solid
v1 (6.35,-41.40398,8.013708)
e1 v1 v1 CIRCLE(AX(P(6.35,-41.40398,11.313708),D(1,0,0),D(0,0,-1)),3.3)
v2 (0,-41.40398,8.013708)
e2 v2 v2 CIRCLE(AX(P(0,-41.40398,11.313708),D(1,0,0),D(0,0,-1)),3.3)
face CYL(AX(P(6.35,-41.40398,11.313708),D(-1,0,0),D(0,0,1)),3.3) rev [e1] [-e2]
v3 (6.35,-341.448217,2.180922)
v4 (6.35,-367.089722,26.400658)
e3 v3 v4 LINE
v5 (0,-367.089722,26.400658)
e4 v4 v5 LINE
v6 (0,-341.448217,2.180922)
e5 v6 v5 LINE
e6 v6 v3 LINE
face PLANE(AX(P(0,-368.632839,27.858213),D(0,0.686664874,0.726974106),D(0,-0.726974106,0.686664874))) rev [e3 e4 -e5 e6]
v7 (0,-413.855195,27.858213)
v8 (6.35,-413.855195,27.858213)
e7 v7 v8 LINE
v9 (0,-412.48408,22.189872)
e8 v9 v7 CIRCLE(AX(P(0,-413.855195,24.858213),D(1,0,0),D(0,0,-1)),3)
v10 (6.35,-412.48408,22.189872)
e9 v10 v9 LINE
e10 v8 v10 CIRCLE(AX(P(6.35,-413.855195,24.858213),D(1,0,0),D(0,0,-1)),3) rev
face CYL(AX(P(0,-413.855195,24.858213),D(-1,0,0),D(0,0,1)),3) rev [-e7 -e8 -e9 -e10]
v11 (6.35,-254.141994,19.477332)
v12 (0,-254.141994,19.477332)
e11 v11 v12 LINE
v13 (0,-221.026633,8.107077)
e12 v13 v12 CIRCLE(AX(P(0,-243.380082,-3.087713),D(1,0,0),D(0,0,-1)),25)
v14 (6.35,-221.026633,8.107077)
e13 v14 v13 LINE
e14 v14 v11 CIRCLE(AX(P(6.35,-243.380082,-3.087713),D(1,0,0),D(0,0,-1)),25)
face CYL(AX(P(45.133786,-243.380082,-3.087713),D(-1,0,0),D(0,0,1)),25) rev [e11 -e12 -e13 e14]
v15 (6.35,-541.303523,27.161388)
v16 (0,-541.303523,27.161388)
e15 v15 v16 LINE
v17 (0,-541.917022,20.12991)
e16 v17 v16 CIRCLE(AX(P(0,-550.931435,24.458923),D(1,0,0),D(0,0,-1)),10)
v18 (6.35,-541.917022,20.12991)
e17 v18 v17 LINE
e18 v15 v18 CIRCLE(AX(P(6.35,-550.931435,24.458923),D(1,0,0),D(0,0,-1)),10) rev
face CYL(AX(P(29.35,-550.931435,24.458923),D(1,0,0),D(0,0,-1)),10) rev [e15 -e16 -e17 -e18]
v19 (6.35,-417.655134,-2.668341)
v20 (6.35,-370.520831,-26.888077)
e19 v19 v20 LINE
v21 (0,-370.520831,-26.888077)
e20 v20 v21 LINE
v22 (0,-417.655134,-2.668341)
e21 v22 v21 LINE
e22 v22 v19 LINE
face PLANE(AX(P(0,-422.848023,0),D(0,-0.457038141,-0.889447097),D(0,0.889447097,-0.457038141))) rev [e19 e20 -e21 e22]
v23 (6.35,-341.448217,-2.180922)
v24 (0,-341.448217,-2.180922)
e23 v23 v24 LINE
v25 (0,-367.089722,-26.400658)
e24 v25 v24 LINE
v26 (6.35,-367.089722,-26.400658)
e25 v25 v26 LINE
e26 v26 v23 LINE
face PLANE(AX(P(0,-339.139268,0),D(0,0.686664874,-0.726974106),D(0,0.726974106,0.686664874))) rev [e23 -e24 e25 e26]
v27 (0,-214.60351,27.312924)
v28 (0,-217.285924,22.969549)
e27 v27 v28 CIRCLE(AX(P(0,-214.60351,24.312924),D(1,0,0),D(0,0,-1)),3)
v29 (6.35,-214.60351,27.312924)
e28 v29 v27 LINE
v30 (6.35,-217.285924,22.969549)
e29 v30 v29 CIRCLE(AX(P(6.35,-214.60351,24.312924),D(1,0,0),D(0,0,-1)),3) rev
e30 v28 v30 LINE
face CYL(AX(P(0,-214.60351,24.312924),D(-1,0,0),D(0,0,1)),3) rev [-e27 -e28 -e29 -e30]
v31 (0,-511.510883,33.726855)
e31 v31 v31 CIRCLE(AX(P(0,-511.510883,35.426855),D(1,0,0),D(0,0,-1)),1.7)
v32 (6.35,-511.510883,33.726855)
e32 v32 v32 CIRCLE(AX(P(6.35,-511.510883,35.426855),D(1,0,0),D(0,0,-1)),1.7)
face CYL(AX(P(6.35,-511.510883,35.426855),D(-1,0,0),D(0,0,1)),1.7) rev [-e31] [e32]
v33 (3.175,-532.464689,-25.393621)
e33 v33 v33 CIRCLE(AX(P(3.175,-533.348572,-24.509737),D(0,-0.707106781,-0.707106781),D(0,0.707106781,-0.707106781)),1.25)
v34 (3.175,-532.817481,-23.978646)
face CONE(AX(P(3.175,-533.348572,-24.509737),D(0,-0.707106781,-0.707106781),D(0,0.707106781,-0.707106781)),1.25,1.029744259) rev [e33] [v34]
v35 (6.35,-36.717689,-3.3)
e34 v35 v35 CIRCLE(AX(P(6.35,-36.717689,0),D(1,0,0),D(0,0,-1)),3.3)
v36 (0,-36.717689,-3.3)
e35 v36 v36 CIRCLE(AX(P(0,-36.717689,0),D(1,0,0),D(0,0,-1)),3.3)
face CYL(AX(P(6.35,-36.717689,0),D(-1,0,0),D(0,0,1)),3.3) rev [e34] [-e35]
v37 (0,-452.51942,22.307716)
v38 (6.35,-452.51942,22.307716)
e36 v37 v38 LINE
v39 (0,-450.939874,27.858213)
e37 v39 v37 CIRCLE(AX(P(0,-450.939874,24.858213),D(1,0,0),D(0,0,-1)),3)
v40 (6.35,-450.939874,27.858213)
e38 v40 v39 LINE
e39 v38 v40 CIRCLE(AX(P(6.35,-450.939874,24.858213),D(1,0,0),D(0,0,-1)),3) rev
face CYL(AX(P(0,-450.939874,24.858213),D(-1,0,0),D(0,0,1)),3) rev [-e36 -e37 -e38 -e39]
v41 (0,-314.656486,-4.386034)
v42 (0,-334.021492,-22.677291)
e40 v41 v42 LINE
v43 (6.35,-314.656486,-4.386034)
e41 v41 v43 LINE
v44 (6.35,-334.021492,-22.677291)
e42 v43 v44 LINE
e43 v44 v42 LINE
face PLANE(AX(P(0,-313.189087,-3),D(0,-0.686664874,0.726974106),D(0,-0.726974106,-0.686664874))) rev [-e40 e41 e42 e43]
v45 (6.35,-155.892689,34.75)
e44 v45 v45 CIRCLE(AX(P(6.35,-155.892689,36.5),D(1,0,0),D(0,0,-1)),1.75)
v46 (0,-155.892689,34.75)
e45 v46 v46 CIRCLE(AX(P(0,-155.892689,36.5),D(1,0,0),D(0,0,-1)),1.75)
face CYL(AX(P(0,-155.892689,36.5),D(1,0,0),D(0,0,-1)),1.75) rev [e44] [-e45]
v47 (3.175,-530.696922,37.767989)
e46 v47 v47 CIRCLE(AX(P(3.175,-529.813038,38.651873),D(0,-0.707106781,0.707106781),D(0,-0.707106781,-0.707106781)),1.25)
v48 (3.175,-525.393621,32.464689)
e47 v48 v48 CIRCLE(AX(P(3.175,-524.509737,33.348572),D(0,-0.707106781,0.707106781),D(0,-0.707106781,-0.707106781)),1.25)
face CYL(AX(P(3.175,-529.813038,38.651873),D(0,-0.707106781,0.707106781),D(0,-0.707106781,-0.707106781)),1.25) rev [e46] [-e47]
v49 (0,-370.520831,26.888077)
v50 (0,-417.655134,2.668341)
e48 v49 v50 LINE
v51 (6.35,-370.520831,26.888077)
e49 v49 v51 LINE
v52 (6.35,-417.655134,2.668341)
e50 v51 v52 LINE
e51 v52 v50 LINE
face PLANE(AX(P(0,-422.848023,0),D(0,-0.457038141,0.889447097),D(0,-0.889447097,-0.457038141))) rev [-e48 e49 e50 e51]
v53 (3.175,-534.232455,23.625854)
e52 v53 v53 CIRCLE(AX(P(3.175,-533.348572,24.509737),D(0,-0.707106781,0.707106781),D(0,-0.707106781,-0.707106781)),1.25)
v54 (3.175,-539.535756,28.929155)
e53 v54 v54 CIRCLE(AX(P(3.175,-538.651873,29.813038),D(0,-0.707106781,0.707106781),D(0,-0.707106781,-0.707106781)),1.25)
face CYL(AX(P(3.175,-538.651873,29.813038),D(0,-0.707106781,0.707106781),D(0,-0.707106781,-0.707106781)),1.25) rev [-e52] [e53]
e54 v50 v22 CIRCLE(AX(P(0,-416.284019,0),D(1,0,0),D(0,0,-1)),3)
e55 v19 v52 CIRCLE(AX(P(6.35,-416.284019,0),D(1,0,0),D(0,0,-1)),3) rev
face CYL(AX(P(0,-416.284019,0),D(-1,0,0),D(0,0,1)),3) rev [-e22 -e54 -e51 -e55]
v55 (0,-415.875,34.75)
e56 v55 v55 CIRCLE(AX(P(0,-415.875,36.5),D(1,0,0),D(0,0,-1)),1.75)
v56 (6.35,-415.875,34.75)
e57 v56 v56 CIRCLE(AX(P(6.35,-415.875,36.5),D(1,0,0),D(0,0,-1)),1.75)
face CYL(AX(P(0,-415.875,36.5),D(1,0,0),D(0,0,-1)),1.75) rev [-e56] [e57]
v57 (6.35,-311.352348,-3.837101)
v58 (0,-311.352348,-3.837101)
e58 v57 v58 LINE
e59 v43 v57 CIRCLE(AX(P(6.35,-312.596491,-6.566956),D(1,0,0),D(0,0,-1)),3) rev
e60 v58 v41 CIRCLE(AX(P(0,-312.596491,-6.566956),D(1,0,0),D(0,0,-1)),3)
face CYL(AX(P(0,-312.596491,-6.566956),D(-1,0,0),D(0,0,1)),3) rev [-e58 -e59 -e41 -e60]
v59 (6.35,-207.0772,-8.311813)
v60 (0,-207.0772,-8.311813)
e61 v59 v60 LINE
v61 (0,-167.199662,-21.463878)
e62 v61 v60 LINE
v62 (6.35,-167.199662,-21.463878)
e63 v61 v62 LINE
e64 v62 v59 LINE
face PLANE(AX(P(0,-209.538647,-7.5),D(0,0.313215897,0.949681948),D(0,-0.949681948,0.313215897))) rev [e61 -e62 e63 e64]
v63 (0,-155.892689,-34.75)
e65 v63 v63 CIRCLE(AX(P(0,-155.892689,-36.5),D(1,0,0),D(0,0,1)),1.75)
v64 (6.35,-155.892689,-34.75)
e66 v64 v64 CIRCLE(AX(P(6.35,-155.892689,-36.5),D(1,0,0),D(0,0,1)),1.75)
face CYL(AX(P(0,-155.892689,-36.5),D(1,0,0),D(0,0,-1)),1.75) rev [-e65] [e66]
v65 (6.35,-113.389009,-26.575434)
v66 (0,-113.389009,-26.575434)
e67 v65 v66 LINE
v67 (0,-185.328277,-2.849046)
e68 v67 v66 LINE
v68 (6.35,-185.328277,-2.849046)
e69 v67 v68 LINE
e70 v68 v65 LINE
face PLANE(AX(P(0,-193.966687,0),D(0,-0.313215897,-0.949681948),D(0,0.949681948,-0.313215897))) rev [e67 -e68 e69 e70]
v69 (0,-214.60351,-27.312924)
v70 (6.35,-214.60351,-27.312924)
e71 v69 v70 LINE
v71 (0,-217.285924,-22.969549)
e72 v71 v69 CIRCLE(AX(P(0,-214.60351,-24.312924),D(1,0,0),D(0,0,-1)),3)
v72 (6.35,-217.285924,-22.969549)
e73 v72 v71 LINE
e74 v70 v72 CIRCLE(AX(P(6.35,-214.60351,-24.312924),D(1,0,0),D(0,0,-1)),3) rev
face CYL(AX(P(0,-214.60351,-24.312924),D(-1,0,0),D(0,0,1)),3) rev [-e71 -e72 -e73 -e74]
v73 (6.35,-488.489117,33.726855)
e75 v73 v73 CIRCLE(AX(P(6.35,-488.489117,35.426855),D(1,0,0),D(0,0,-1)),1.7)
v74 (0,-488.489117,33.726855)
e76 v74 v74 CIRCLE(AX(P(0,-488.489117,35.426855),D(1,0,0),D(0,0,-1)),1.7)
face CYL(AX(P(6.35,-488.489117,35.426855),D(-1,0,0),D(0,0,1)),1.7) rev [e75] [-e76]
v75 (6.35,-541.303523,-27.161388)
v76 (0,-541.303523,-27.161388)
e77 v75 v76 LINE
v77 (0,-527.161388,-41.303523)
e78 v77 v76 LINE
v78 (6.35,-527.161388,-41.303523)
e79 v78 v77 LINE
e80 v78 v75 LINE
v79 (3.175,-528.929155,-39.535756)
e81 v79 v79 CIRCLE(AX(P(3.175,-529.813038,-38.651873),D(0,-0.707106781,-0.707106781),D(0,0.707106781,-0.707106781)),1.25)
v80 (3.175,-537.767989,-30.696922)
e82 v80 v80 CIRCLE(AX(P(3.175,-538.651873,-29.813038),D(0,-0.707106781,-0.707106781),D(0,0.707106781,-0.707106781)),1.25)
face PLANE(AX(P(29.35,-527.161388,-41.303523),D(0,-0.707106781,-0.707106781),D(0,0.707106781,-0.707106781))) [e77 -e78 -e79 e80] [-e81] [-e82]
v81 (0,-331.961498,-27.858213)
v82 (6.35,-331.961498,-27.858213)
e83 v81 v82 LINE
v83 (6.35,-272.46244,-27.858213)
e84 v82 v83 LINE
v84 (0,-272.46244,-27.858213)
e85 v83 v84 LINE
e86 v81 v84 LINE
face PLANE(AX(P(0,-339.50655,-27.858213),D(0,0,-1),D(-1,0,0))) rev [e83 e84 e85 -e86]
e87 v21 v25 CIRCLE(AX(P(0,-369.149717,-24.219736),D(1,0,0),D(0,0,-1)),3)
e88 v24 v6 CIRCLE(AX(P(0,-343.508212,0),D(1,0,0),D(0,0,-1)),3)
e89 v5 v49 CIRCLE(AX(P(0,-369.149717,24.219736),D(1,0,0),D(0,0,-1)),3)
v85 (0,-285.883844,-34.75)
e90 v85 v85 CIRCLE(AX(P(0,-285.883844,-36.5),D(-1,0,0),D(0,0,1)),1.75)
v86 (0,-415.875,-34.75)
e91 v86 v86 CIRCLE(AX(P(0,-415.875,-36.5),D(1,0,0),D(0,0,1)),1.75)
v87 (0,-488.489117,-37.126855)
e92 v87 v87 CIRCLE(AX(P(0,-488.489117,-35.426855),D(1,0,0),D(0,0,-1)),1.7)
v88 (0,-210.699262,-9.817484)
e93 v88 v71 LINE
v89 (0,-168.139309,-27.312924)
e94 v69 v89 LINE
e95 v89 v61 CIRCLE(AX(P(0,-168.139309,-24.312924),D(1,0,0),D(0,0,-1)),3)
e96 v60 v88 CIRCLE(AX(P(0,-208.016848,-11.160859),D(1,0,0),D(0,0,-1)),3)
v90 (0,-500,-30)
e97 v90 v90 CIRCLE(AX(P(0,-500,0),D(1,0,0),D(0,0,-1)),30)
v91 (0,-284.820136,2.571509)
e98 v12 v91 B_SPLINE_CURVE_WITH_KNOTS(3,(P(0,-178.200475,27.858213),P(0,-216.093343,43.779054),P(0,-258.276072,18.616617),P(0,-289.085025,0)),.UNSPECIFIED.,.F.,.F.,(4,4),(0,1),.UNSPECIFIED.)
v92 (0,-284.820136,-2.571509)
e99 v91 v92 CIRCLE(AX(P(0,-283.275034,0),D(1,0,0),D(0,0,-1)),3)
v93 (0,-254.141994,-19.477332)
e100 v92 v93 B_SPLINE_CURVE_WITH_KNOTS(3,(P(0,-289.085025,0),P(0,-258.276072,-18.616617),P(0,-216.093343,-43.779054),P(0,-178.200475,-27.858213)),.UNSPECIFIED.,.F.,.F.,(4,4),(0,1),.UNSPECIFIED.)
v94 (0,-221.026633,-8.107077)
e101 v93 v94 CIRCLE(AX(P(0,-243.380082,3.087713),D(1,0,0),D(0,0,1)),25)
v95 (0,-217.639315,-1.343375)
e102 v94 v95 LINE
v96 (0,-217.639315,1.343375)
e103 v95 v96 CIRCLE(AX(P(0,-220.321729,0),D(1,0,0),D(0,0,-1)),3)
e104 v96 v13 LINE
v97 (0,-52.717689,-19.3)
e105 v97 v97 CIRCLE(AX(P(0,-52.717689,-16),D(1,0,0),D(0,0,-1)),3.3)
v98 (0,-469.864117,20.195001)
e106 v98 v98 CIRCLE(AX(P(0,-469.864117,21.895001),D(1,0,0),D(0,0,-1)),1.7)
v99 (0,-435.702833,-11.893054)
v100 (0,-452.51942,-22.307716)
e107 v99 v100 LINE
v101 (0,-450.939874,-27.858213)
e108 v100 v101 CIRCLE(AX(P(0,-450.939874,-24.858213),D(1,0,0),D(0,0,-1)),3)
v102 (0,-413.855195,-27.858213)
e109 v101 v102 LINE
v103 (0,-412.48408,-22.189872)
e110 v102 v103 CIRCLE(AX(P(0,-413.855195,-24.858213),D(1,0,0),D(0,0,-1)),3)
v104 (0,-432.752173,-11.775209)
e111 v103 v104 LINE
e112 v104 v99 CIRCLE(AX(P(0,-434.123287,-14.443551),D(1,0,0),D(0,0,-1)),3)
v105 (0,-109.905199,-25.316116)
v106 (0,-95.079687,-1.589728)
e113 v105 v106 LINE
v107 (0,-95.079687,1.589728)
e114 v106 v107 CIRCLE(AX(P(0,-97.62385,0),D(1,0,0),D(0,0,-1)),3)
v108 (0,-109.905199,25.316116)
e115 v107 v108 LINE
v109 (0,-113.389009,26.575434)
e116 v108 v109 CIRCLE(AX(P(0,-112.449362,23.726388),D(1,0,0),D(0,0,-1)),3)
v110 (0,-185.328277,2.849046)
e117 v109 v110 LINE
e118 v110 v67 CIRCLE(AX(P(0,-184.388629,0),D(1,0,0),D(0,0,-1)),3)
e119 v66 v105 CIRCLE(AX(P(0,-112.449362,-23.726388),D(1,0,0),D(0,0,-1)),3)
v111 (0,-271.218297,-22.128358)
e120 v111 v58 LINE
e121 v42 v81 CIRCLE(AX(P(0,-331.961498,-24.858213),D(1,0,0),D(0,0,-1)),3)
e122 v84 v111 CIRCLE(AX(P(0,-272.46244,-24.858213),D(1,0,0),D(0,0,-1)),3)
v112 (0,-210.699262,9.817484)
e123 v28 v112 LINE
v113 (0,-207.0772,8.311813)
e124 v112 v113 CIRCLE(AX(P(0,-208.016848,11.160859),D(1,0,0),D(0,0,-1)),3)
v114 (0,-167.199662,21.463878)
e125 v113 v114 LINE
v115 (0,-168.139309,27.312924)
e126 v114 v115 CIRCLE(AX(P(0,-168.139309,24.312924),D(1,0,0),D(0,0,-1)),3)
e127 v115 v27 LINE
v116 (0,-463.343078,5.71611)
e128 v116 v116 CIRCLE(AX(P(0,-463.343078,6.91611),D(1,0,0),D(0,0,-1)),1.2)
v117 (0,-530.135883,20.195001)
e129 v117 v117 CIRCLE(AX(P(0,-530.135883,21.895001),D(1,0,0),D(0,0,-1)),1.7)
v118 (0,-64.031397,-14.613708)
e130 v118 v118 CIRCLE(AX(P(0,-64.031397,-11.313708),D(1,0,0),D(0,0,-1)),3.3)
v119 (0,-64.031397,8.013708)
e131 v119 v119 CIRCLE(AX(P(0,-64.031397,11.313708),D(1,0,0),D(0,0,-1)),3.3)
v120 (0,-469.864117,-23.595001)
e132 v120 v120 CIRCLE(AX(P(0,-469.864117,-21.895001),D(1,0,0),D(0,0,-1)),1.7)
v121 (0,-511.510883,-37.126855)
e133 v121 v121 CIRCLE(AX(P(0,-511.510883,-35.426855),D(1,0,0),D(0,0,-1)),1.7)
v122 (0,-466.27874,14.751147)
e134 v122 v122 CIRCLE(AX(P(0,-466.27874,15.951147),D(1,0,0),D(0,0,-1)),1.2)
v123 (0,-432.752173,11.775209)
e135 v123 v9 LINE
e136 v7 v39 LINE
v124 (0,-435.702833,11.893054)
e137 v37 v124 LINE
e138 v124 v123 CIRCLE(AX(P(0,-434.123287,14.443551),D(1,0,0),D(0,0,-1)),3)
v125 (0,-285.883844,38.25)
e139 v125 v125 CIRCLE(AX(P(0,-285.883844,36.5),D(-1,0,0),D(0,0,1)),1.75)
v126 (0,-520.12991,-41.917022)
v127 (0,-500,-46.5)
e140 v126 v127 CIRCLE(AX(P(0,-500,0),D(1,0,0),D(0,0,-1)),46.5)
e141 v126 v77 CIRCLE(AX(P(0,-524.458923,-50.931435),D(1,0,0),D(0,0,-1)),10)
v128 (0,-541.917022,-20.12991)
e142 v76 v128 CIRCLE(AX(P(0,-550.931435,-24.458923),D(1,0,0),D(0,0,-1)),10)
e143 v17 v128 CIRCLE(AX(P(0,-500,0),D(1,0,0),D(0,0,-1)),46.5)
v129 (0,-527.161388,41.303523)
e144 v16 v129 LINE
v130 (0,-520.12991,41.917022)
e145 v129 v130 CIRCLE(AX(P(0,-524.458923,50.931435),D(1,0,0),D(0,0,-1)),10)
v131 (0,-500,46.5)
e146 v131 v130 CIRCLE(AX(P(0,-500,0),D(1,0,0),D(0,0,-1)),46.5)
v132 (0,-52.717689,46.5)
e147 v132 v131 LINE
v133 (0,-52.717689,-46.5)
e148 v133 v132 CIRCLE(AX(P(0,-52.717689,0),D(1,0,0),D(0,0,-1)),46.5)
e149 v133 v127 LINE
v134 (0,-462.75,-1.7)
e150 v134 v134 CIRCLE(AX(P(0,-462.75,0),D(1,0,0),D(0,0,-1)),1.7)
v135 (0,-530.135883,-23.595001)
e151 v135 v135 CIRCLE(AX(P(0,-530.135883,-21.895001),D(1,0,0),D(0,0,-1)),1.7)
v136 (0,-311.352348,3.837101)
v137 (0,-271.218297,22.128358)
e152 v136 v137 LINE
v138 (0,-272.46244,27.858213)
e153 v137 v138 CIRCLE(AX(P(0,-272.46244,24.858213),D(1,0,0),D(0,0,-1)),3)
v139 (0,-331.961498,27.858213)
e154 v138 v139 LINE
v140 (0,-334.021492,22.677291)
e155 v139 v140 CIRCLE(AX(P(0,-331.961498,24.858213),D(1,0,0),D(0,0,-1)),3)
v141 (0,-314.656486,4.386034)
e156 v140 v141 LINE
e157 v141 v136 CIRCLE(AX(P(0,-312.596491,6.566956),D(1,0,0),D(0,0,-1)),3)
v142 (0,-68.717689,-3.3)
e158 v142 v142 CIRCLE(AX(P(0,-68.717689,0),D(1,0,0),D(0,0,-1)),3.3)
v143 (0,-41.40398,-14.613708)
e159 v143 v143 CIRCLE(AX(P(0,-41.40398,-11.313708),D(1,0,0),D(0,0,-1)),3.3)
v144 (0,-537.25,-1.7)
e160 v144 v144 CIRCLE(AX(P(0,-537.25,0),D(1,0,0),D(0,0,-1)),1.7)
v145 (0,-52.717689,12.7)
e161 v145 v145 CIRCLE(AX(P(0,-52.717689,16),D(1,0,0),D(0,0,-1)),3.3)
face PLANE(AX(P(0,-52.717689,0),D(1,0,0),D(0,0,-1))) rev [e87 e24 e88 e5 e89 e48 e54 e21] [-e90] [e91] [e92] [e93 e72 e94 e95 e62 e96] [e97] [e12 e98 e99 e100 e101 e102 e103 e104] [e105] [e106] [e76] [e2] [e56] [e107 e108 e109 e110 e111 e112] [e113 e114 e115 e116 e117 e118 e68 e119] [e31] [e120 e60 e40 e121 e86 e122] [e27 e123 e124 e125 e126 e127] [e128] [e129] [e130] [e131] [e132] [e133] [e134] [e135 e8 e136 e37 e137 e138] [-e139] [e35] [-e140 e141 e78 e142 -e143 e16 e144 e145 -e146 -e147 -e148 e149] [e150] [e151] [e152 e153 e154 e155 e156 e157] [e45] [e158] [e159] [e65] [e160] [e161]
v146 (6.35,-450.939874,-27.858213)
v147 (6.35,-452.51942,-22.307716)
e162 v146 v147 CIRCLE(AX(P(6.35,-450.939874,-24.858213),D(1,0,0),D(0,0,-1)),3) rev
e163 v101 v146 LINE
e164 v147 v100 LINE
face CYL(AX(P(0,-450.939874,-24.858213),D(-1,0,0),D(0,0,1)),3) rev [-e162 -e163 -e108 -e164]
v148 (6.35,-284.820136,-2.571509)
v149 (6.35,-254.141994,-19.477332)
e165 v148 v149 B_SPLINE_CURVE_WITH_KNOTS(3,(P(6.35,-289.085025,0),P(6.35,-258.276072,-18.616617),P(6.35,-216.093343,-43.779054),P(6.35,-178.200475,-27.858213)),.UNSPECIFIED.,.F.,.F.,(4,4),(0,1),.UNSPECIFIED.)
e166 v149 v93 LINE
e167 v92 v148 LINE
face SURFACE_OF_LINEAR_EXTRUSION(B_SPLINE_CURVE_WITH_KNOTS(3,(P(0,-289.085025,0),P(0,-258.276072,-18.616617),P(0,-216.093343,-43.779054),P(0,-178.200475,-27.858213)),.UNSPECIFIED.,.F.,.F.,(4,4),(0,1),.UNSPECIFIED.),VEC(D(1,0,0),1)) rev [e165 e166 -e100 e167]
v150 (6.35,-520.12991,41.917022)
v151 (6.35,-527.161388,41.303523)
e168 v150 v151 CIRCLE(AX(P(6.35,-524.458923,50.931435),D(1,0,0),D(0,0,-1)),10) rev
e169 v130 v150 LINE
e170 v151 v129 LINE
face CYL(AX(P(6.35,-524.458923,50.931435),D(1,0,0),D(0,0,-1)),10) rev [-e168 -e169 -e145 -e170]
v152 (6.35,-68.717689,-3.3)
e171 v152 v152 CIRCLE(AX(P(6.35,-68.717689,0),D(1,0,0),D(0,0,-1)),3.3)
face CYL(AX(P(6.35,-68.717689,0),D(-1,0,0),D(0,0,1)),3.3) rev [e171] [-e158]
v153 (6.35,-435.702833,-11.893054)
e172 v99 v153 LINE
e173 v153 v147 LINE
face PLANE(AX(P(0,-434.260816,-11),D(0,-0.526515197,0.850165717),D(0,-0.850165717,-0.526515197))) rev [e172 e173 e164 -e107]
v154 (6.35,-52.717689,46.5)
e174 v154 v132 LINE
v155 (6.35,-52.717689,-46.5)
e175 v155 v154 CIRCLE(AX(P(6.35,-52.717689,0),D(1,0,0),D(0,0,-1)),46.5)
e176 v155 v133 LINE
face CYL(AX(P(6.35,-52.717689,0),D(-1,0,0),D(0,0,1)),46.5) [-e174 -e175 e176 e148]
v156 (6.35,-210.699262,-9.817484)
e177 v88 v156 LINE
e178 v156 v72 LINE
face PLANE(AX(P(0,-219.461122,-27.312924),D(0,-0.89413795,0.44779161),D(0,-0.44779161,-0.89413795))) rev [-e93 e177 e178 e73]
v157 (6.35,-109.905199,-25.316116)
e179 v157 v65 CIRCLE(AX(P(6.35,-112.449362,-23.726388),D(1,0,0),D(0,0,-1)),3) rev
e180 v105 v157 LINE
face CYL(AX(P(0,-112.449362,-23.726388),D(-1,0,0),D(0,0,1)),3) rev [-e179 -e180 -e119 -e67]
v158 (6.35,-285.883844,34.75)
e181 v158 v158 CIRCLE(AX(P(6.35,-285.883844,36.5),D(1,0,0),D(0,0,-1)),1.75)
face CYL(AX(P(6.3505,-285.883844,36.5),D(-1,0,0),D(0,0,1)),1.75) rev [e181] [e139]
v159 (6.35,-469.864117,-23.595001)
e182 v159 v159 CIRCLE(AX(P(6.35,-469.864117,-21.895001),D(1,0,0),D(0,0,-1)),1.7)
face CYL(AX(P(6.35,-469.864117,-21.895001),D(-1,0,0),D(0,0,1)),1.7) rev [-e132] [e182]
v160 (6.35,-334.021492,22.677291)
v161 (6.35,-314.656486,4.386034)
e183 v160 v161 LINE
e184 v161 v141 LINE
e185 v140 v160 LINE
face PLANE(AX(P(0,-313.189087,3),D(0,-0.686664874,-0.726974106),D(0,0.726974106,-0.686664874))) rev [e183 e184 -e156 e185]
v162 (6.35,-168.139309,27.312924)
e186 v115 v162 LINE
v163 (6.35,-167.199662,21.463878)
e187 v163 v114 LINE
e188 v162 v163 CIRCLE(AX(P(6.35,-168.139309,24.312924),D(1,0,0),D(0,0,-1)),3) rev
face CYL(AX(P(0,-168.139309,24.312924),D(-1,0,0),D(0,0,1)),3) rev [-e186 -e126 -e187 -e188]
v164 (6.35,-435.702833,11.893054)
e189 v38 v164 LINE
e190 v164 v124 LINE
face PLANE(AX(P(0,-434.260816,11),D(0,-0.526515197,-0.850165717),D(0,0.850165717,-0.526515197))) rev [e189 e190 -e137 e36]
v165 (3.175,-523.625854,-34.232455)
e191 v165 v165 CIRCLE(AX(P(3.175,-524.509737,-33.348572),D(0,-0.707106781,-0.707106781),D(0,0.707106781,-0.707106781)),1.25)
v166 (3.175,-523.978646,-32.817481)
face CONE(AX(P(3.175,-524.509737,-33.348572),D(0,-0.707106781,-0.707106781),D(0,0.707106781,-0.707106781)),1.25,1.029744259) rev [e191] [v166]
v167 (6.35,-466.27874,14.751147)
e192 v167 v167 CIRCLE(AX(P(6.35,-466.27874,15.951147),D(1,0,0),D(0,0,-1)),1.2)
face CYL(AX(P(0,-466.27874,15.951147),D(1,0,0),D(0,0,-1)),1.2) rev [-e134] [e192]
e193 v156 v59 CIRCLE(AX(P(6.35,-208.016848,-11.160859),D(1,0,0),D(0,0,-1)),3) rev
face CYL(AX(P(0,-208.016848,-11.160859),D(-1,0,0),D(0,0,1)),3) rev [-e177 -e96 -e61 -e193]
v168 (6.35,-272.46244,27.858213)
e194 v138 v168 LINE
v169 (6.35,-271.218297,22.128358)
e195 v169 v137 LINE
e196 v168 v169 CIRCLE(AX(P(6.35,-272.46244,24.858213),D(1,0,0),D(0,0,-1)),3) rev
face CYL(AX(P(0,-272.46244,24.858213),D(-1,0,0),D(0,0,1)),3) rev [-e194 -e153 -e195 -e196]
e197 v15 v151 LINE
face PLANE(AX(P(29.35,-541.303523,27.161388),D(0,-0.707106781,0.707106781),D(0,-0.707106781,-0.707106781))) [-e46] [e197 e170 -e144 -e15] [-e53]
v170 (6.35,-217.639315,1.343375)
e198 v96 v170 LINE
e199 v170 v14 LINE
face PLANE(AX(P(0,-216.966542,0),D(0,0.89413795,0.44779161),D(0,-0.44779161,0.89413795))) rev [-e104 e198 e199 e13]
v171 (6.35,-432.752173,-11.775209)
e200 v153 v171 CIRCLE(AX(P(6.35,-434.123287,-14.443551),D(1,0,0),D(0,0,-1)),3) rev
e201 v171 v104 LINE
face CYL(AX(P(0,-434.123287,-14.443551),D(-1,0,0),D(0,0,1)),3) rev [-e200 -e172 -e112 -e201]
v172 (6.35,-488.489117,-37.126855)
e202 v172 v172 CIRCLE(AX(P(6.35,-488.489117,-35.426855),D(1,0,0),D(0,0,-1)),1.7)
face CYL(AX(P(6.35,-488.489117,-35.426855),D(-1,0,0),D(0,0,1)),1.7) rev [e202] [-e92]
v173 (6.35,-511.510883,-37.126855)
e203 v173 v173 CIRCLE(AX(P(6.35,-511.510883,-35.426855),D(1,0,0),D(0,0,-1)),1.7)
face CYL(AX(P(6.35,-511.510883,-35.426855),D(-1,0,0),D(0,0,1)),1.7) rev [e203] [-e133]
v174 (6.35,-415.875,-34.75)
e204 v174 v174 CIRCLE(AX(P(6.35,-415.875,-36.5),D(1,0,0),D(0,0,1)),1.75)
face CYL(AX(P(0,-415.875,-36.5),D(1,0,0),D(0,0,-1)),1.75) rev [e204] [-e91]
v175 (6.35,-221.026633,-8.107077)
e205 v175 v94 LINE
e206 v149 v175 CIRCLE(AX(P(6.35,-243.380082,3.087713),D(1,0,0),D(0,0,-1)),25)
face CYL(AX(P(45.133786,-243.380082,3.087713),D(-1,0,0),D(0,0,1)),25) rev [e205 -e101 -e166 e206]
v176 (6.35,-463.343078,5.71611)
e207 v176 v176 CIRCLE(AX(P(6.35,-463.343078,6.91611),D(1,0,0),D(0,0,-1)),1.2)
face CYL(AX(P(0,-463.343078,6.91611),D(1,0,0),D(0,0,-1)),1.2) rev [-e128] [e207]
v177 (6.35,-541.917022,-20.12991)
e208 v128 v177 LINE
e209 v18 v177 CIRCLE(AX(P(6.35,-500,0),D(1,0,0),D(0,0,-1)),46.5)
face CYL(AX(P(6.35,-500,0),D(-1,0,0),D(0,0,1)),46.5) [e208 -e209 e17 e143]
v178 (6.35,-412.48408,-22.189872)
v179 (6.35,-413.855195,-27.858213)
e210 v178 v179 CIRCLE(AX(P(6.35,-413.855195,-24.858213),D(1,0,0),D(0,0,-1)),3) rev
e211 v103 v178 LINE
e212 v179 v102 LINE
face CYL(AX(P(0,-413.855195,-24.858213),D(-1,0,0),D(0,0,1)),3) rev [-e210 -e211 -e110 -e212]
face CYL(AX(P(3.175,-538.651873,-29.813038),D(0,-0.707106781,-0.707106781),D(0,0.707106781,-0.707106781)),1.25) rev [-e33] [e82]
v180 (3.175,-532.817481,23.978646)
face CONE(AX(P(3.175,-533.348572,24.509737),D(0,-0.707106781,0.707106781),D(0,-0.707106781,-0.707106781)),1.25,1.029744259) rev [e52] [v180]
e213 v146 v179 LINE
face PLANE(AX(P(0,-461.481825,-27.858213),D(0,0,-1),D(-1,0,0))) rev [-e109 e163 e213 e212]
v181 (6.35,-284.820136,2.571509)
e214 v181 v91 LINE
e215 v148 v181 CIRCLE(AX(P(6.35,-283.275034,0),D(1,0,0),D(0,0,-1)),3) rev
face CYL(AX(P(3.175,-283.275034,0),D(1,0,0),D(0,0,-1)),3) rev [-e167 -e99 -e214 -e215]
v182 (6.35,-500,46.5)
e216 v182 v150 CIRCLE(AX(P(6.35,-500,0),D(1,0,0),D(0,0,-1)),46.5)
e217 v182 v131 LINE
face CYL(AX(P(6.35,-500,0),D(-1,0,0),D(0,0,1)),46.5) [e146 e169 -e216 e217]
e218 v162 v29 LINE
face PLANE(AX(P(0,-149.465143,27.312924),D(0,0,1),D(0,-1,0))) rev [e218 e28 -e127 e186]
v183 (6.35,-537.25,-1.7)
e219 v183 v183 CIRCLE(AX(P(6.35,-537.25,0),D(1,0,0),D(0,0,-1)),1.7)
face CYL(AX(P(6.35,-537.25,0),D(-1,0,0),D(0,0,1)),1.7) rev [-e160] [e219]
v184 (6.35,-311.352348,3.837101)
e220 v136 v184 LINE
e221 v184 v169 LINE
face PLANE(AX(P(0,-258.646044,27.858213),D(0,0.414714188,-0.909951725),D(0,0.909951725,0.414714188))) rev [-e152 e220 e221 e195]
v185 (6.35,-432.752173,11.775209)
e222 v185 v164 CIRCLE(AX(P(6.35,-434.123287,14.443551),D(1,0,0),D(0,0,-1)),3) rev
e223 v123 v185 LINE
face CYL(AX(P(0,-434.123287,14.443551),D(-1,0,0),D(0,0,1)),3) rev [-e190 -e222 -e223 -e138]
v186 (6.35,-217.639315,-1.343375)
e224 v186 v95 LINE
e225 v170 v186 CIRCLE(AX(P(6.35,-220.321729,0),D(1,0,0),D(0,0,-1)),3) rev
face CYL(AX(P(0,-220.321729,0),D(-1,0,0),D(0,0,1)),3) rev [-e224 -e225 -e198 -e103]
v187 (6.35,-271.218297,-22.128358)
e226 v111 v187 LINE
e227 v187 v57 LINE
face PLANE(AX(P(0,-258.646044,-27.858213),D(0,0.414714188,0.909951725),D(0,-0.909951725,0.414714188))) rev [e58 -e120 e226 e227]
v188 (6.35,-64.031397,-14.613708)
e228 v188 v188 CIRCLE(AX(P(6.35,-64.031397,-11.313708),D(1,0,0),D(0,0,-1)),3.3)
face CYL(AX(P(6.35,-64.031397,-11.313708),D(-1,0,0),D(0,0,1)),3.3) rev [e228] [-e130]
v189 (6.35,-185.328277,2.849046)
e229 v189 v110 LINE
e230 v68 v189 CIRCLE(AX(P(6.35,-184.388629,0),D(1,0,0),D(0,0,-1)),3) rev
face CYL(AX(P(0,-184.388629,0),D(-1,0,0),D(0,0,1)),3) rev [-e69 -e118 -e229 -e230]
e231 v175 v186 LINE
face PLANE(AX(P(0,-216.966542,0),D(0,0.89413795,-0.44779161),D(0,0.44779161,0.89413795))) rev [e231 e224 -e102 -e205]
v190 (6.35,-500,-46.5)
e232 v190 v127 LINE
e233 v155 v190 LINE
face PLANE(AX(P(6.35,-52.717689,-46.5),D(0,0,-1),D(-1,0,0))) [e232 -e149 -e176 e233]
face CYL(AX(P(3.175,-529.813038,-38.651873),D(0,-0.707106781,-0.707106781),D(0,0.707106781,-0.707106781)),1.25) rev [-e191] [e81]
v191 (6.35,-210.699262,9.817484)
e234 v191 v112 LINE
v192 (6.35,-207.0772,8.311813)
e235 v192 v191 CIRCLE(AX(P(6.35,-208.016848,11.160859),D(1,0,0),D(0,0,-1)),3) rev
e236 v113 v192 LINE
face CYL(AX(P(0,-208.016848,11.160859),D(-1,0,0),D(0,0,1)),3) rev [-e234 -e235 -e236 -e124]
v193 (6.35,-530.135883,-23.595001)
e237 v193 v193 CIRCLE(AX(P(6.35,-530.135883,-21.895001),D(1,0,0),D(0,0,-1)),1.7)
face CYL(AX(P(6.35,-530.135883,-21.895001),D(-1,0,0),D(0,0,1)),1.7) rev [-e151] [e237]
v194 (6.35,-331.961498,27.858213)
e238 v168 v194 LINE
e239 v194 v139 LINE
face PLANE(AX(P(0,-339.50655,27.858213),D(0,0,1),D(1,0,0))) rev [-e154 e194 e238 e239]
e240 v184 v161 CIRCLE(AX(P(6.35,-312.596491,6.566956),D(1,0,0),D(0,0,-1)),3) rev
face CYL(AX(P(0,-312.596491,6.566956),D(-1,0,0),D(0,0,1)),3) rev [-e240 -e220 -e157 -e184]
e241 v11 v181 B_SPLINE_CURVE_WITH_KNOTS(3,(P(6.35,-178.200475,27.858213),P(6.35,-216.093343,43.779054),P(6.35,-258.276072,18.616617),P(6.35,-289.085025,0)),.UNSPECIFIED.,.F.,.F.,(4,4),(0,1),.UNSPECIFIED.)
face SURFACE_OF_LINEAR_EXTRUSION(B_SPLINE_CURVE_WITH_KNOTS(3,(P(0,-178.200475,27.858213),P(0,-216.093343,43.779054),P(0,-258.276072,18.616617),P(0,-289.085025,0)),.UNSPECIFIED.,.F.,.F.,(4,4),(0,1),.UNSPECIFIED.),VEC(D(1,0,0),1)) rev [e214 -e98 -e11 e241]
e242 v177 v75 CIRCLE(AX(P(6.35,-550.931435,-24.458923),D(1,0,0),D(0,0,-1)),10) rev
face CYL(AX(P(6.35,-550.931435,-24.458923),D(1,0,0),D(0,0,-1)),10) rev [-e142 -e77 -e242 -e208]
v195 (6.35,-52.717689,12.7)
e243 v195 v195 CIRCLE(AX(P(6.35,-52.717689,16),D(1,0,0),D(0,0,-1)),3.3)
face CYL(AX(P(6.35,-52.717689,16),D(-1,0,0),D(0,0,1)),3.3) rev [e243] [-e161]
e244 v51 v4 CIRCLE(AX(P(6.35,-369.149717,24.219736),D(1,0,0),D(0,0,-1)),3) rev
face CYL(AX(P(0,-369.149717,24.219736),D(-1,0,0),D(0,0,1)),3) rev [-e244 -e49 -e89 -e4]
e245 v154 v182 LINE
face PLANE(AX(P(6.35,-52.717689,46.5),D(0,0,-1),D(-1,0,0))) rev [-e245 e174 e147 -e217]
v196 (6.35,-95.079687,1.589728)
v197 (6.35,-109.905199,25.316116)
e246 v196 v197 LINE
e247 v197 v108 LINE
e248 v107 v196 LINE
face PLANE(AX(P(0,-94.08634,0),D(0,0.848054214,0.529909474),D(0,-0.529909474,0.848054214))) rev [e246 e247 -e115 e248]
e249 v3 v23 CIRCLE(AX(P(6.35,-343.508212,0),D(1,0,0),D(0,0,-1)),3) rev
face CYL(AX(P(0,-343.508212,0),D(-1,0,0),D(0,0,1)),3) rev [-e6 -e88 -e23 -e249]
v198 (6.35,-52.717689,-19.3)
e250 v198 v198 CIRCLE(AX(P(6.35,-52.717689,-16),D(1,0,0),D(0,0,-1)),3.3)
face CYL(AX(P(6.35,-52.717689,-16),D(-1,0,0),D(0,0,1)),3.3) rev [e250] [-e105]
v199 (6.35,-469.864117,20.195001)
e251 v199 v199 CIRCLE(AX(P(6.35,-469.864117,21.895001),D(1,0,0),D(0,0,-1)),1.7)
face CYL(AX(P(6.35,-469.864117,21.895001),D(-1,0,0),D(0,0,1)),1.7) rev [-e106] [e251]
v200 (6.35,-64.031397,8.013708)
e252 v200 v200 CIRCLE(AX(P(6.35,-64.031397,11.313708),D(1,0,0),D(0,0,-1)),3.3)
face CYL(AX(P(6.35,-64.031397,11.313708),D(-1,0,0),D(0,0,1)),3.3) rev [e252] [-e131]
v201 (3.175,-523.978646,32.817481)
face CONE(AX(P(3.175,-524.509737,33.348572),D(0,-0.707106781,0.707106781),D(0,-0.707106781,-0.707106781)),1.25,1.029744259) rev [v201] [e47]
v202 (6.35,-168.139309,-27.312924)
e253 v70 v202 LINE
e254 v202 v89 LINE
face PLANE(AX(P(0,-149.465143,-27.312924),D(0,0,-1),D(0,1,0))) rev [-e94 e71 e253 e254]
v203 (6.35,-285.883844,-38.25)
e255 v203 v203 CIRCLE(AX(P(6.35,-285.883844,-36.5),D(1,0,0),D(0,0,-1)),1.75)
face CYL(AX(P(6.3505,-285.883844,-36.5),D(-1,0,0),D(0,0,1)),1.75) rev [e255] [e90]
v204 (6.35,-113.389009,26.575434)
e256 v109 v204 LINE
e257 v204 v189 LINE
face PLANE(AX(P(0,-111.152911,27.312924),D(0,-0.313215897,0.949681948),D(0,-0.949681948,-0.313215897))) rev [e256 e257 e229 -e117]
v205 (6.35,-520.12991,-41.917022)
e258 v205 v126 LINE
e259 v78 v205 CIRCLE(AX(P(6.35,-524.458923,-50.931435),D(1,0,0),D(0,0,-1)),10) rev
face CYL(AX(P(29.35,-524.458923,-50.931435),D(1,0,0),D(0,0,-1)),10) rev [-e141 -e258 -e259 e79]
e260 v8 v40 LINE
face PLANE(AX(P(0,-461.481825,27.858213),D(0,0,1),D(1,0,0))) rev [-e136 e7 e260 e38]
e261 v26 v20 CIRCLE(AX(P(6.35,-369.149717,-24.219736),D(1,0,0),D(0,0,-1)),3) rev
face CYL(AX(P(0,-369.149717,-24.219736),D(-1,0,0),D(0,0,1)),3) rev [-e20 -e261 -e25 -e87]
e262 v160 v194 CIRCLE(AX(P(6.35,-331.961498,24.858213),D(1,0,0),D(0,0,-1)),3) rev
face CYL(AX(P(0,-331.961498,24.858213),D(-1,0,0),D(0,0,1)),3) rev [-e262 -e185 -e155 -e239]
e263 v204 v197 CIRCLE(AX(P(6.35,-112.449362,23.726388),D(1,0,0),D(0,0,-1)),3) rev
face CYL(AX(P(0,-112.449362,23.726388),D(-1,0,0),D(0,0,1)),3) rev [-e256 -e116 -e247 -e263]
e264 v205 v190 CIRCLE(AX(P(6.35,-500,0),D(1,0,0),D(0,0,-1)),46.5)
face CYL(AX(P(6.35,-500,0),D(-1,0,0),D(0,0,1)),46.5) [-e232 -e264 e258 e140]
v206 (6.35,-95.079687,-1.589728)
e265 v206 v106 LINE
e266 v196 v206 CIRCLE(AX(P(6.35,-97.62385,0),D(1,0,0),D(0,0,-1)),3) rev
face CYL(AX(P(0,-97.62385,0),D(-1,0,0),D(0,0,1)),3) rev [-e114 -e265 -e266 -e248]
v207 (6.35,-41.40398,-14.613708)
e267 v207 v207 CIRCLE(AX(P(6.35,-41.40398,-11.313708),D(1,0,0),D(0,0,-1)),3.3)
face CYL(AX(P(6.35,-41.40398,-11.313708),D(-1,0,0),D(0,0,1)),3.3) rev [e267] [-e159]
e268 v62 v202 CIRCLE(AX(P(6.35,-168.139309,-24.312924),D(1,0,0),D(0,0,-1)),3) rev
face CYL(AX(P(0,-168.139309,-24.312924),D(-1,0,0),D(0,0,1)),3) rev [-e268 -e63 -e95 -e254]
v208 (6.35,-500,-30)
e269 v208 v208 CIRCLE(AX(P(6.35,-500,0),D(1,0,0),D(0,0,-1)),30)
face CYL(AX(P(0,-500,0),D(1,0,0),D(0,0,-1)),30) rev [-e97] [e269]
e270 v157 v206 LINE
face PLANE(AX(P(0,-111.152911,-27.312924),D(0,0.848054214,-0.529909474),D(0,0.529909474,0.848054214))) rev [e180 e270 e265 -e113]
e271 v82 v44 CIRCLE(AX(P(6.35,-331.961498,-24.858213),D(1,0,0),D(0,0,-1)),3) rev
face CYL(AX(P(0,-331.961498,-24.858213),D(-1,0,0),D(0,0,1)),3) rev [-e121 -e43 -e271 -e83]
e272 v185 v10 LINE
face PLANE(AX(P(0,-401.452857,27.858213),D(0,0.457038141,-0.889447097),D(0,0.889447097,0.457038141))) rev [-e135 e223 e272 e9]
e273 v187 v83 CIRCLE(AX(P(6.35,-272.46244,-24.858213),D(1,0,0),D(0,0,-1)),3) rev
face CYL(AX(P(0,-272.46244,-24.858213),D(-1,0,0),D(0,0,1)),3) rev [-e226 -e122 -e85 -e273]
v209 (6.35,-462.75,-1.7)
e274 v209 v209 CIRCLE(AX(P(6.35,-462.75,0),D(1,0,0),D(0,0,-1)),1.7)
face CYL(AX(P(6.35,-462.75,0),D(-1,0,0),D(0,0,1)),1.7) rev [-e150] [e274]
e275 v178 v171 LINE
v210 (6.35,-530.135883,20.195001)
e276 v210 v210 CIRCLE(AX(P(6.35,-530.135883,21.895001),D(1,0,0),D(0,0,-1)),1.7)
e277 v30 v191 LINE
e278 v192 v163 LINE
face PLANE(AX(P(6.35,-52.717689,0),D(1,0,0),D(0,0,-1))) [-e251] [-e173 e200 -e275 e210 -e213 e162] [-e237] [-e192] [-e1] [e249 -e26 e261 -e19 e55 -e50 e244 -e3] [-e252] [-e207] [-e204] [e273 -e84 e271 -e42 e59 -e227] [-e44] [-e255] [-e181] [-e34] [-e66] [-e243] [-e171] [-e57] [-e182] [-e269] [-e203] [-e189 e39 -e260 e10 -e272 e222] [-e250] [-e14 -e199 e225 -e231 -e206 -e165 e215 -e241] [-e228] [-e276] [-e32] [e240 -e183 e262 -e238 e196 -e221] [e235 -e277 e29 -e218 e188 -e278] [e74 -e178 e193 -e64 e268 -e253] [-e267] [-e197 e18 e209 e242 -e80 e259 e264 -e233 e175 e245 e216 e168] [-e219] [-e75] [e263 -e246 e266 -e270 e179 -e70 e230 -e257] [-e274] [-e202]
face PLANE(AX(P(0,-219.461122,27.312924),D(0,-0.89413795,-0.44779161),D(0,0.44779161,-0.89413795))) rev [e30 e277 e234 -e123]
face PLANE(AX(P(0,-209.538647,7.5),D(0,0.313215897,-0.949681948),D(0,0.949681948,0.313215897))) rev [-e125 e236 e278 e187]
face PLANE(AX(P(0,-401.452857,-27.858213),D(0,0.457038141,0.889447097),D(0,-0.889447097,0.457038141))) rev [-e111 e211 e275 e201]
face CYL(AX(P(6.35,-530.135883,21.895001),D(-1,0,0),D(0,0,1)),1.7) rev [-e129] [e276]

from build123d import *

# Parameters (mm, degrees)
SKETCH1_R                            = 3.3
SKETCH1_R_2                          = 1.7
SKETCH1_R_3                          = 26
BOSS_EXTRUDE1_DEPTH                  = 6.35
CUT_EXTRUDE1_DEPTH                   = 549.511460682
FILLET1_R                            = 3
SKETCH4_R                            = 1.75
CUT_EXTRUDE2_DEPTH                   = 549.511460792
SKETCH5_R                            = 1.2
CUT_EXTRUDE4_DEPTH                   = 549.511460792
BOSS_EXTRUDE2_START                  = -6.35
BOSS_EXTRUDE2_DEPTH                  = 6.35
TAP_DRILL_FOR_M3X0_5_TAP1_AT_2_COUNT = 2
TAP_DRILL_FOR_M3X0_5_TAP1_AT_2_PITCH = 13.03070812
CIRPATTERN1_COUNT                    = 2
CIRPATTERN1_ANGLE                    = 90
CUT_EXTRUDE5_DEPTH                   = 549.511460792
SKETCH10_R                           = 30
CUT_EXTRUDE6_DEPTH                   = 549.511460792
SKETCH11_W                           = 93
SKETCH11_H                           = 52.717688801
CUT_EXTRUDE7_DEPTH                   = 549.511460792
BOSS_EXTRUDE3_DEPTH                  = 6.35
SKETCH13_R                           = 1.75
CUT_EXTRUDE8_DEPTH                   = 549.511460792
SKETCH14_R                           = 1.75
BOSS_EXTRUDE4_DEPTH                  = 6.35
BOSS_EXTRUDE5_DEPTH                  = 6.35
CIRPATTERN2_COUNT                    = 2
CIRPATTERN2_ANGLE                    = 90
FILLET2_R                            = 10


# Read off the part's stored shape, not the designer's step: M3x0.5 Tapped Hole1
with BuildPart() as part:
    # Sketch1 → Boss-Extrude1 (new body)
    with BuildSketch(Plane(origin=(0, 0, 0), x_dir=(0, -1, 0), z_dir=(1, 0, 0))):
        with BuildLine():
            Line((0, 46.5), (500, 46.5))
            ThreePointArc((500, 46.5), (546.5, 0), (500, -46.5))
            Line((500, -46.5), (0, -46.5))
            ThreePointArc((0, -46.5), (-46.5, 0), (0, 46.5))
        make_face()
        with Locations(Location((-16, 0, 0), (0, 0, 90))):
            Circle(SKETCH1_R, mode=Mode.SUBTRACT)
        with Locations(Location((-11.313708499, 11.313708499, 0), (0, 0, 90))):
            Circle(SKETCH1_R, mode=Mode.SUBTRACT)
        with Locations(Location((0, 16, 0), (0, 0, 90))):
            Circle(SKETCH1_R, mode=Mode.SUBTRACT)
        with Locations(Location((11.313708499, 11.313708499, 0), (0, 0, 90))):
            Circle(SKETCH1_R, mode=Mode.SUBTRACT)
        with Locations(Location((16, 0, 0), (0, 0, 90))):
            Circle(SKETCH1_R, mode=Mode.SUBTRACT)
        with Locations(Location((11.313708499, -11.313708499, 0), (0, 0, 90))):
            Circle(SKETCH1_R, mode=Mode.SUBTRACT)
        with Locations(Location((537.25, 0, 0), (0, 0, 90))):
            Circle(SKETCH1_R_2, mode=Mode.SUBTRACT)
        with Locations(Location((530.13588304, -21.895000648, 0), (0, 0, 90))):
            Circle(SKETCH1_R_2, mode=Mode.SUBTRACT)
        with Locations(Location((511.51088304, -35.426855232, 0), (0, 0, 90))):
            Circle(SKETCH1_R_2, mode=Mode.SUBTRACT)
        with Locations(Location((488.48911696, -35.426855232, 0), (0, 0, 90))):
            Circle(SKETCH1_R_2, mode=Mode.SUBTRACT)
        with Locations(Location((469.86411696, -21.895000648, 0), (0, 0, 90))):
            Circle(SKETCH1_R_2, mode=Mode.SUBTRACT)
        with Locations(Location((462.75, 0, 0), (0, 0, 90))):
            Circle(SKETCH1_R_2, mode=Mode.SUBTRACT)
        with Locations(Location((469.86411696, 21.895000648, 0), (0, 0, 90))):
            Circle(SKETCH1_R_2, mode=Mode.SUBTRACT)
        with Locations(Location((488.48911696, 35.426855232, 0), (0, 0, 90))):
            Circle(SKETCH1_R_2, mode=Mode.SUBTRACT)
        with Locations(Location((511.51088304, 35.426855232, 0), (0, 0, 90))):
            Circle(SKETCH1_R_2, mode=Mode.SUBTRACT)
        with Locations(Location((530.13588304, 21.895000648, 0), (0, 0, 90))):
            Circle(SKETCH1_R_2, mode=Mode.SUBTRACT)
        with Locations(Location((500, 0, 0), (0, 0, 90))):
            Circle(SKETCH1_R_3, mode=Mode.SUBTRACT)
        with Locations(Location((0, -16, 0), (0, 0, 90))):
            Circle(SKETCH1_R, mode=Mode.SUBTRACT)
        with Locations(Location((-11.313708499, -11.313708499, 0), (0, 0, 90))):
            Circle(SKETCH1_R, mode=Mode.SUBTRACT)
    extrude(amount=BOSS_EXTRUDE1_DEPTH)

    # Sketch3 → Cut-Extrude1 (cut, through all)
    with BuildSketch(Plane(origin=(6.35, 0, 0), x_dir=(0, 0, -1), z_dir=(1, 0, 0))):
        Polygon((0, -422.848022722), (27.858212922, -368.632839363), (0, -339.139268075), (-27.858212922, -368.632839363), align=None)
        Polygon((0, -41.368651369), (-27.312924288, -58.435222232), (0, -141.248998295), (27.312924288, -58.435222232), align=None)
        Polygon((3, -313.189087212), (27.858212922, -339.506549748), (27.858212922, -258.646044282), align=None)
        Polygon((-27.858212922, -339.506549748), (-27.858212922, -258.646044282), (-3, -313.189087212), align=None)
        Polygon((-27.858212922, -401.452857349), (-11, -434.260816252), (-27.858212922, -461.481824785), align=None)
        Polygon((11, -434.260816252), (27.858212922, -461.481824785), (27.858212922, -401.452857349), align=None)
        with BuildLine():
            Line((0, -164.248853344), (-27.858212922, -178.200474573))
            add(Edge.make_bspline(
                [(-27.858212922, -178.200474573), (-43.7790539, -216.093343216), (-18.61661693, -258.276071598), (0, -289.085024731)],
                knots=[0, 0, 0, 0, 1, 1, 1, 1], degree=3))
            add(Edge.make_bspline(
                [(27.858212922, -178.200474573), (43.7790539, -216.093343216), (18.61661693, -258.276071598), (0, -289.085024731)],
                knots=[0, 0, 0, 0, 1, 1, 1, 1], degree=3))
            Line((27.858212922, -178.200474573), (0, -164.248853344))
        make_face()
        Polygon((7.5, -156.820958214), (27.312924288, -96.747453897), (27.312924288, -166.743432993), align=None)
        Polygon((-27.312924288, -96.747453897), (-27.312924288, -166.743432993), (-7.5, -156.820958214), align=None)
    extrude(amount=-CUT_EXTRUDE1_DEPTH, mode=Mode.SUBTRACT)

    # Fillet1
    fillet1_edges = [part.edges().sort_by_distance(p)[0] for p in [
        (3.175, -58.435222232, -27.312924288),
        (3.175, -41.368651369, 0),
        (3.175, -58.435222232, 27.312924288),
        (3.175, -141.248998295, 0),
        (3.175, -289.085024731, 0),
        (3.175, -164.248853344, 0),
        (3.175, -401.452857349, 27.858212922),
        (3.175, -434.260816252, 11),
        (3.175, -461.481824785, 27.858212922),
        (3.175, -461.481824785, -27.858212922),
        (3.175, -434.260816252, -11),
        (3.175, -401.452857349, -27.858212922),
        (3.175, -368.632839363, -27.858212922),
        (3.175, -339.139268075, 0),
        (3.175, -368.632839363, 27.858212922),
        (3.175, -422.848022722, 0),
        (3.175, -313.189087212, 3),
        (3.175, -339.506549748, 27.858212922),
        (3.175, -258.646044282, 27.858212922),
        (3.175, -178.200474573, -27.858212922),
        (3.175, -178.200474573, 27.858212922),
        (3.175, -339.506549748, -27.858212922),
        (3.175, -313.189087212, -3),
        (3.175, -258.646044282, -27.858212922),
        (3.175, -96.747453897, 27.312924288),
        (3.175, -166.743432993, 27.312924288),
        (3.175, -156.820958214, 7.5),
        (3.175, -166.743432993, -27.312924288),
        (3.175, -156.820958214, -7.5),
        (3.175, -96.747453897, -27.312924288),
    ]]
    fillet(fillet1_edges, radius=FILLET1_R)

    # Sketch4 → Cut-Extrude2 (cut, through all)
    with BuildSketch(Plane(origin=(6.35, 0, 0), x_dir=(0, 0, -1), z_dir=(1, 0, 0))):
        with Locations((-36.5, -103.175)):
            Circle(SKETCH4_R)
        with Locations(Location((36.5, -103.175, 0), (0, 0, 180))):
            Circle(SKETCH4_R)
        with Locations(Location((-36.5, -259.525, 0), (0, 0, 180))):
            Circle(SKETCH4_R)
        with Locations((36.5, -259.525)):
            Circle(SKETCH4_R)
        with Locations((-36.5, -415.875)):
            Circle(SKETCH4_R)
        with Locations(Location((36.5, -415.875, 0), (0, 0, 180))):
            Circle(SKETCH4_R)
    extrude(amount=-CUT_EXTRUDE2_DEPTH, mode=Mode.SUBTRACT)

    # Sketch5 → Cut-Extrude4 (cut, through all)
    with BuildSketch(Plane(origin=(6.35, 0, 0), x_dir=(0, 0, -1), z_dir=(1, 0, 0))):
        with Locations((-6.916110339, -463.343078174)):
            Circle(SKETCH5_R)
        with Locations((-15.951147244, -466.27873962)):
            Circle(SKETCH5_R)
    extrude(amount=-CUT_EXTRUDE4_DEPTH, mode=Mode.SUBTRACT)

    # Sketch6 → Boss-Extrude2 (add)
    with BuildSketch(Plane(origin=(6.35, 0, 0), x_dir=(0, 0, -1), z_dir=(1, 0, 0)).offset(BOSS_EXTRUDE2_START)):
        with BuildLine():
            Line((-44.110383395, -529.968247771), (-29.968247771, -544.110383395))
            ThreePointArc((-29.968247771, -544.110383395), (-23.286397782, -542.399293624), (-16.474718596, -543.483717035))
            ThreePointArc((-16.474718596, -543.483717035), (-32.880465325, -532.880465325), (-43.483717035, -516.474718596))
            ThreePointArc((-43.483717035, -516.474718596), (-42.399293624, -523.286397782), (-44.110383395, -529.968247771))
        make_face()
    boss_extrude2 = extrude(amount=BOSS_EXTRUDE2_DEPTH)

    # Sketch8 → Tap Drill for M3x0.5 Tap1 (revolve, cut)
    with BuildSketch(Plane(origin=(3.175, -532.796674896, 41.28195627), x_dir=(0, -0.7071067811865424, -0.7071067811865527), z_dir=(1, 0, 0))):
        Polygon((0, 0), (0, 5.751075774), (1.25, 5), (1.25, 0), align=None)
    tap_drill_for_m3x0_5_tap1 = revolve(axis=Axis((3.175, -537.286802956, 45.772084331), (0, 0.7071067811865529, -0.7071067811865422)), mode=Mode.SUBTRACT)

    # Tap Drill for M3x0.5 Tap1 at 2: Tap Drill for M3x0.5 Tap1 ×2
    with Locations(*[Vector(0, -0.7071067811865422, -0.7071067811865529) * (i * TAP_DRILL_FOR_M3X0_5_TAP1_AT_2_PITCH) for i in range(1, TAP_DRILL_FOR_M3X0_5_TAP1_AT_2_COUNT)]):
        add(tap_drill_for_m3x0_5_tap1, mode=Mode.SUBTRACT)

    # CirPattern1: Boss-Extrude2, Tap Drill for M3x0.5 Tap1 ×2 about axis
    cirpattern1_axis = Axis((0, -500, 0), (1, 0, 0))
    add([boss_extrude2.rotate(cirpattern1_axis, i * CIRPATTERN1_ANGLE / (CIRPATTERN1_COUNT - 1)) for i in range(1, CIRPATTERN1_COUNT)])
    add([tap_drill_for_m3x0_5_tap1.rotate(cirpattern1_axis, i * CIRPATTERN1_ANGLE / (CIRPATTERN1_COUNT - 1)) for i in range(1, CIRPATTERN1_COUNT)], mode=Mode.SUBTRACT)

    # CirPattern1 copy 1 sketch → CirPattern1 copy 1 (revolve, cut)
    with BuildSketch(Plane(origin=(3.175, -532.067854195, -42.010776971), x_dir=(0, 0.7071067811865551, -0.7071067811865399), z_dir=(1, 0, 0))):
        Polygon((0, 0), (0, 5.751075774), (1.25, 5), (1.25, 0), align=None)
    revolve(axis=Axis((3.175, -536.557982255, -46.500905032), (0, 0.7071067811865398, 0.7071067811865553)), mode=Mode.SUBTRACT)

    # Sketch9 → Cut-Extrude5 (cut, through all)
    with BuildSketch(Plane(origin=(6.35, 0, 0), x_dir=(0, 0, -1), z_dir=(1, 0, 0))):
        with BuildLine():
            Line((-43.483717035, -516.474718596), (-63.483717035, -516.474718596))
            ThreePointArc((-63.483717035, -516.474718596), (0, -565.586573942), (63.483717035, -516.474718596))
            Line((63.483717035, -516.474718596), (43.483717035, -516.474718596))
            ThreePointArc((43.483717035, -516.474718596), (0, -546.5), (-43.483717035, -516.474718596))
        make_face()
    extrude(amount=-CUT_EXTRUDE5_DEPTH, mode=Mode.SUBTRACT)

    # Sketch10 → Cut-Extrude6 (cut, through all)
    with BuildSketch(Plane(origin=(6.35, 0, 0), x_dir=(0, 0, -1), z_dir=(1, 0, 0))):
        with Locations((0, -500)):
            Circle(SKETCH10_R)
    extrude(amount=-CUT_EXTRUDE6_DEPTH, mode=Mode.SUBTRACT)

    # Sketch11 → Cut-Extrude7 (cut, through all)
    with BuildSketch(Plane.ZY):
        with Locations((0, -205.625859872)):
            Rectangle(SKETCH11_W, SKETCH11_H)
    extrude(amount=-CUT_EXTRUDE7_DEPTH, mode=Mode.SUBTRACT)


with BuildPart() as cut_extrude7_piece_1:
    # of the separate pieces the step leaves, piece 1, a body of its own (cut_extrude7_pieces)
    add(part.part.solids().sort_by_distance((0, -500, 46.5))[0])


with BuildPart() as cut_extrude7_piece_2:
    # of the separate pieces the step leaves, piece 2, a body of its own (cut_extrude7_pieces)
    add(part.part.solids().sort_by_distance((0, -179.267015471, 46.5))[0])


with BuildPart() as cut_extrude7_piece_2_1:
    # Body-Move/Copy1: moved
    add(cut_extrude7_piece_2.part.moved(Location((0, -52.7176888, 0))))

    # Combine1: union Cut-Extrude7 piece 1
    add(cut_extrude7_piece_1.part)

    # Sketch12 → Boss-Extrude3 (add)
    with BuildSketch(Plane.ZY):
        with BuildLine():
            Line((-8.107077378, -221.026632904), (-26.8521577, -230.414322677))
            ThreePointArc((-26.8521577, -230.414322677), (-27.717865763, -231.066969848), (-28.295067899, -231.984704273))
            add(Edge.make_bspline(
                [(-19.477332048, -254.141993575), (-22.908456866, -246.947780666), (-25.966776611, -239.522857913), (-28.295067899, -231.984704273)],
                knots=[0.341715687, 0.341715687, 0.341715687, 0.341715687, 0.53746001, 0.53746001, 0.53746001, 0.53746001], degree=3))
            ThreePointArc((-19.477332048, -254.141993575), (-20.557337263, -235.261485452), (-8.107077378, -221.026632904))
        make_face()
        with BuildLine():
            Line((8.107077378, -221.026632904), (26.8521577, -230.414322677))
            ThreePointArc((26.8521577, -230.414322677), (27.717865763, -231.066969847), (28.295067899, -231.984704271))
            add(Edge.make_bspline(
                [(28.295067899, -231.984704271), (25.966776612, -239.522857912), (22.908456866, -246.947780666), (19.477332048, -254.141993575)],
                knots=[0.46253999, 0.46253999, 0.46253999, 0.46253999, 0.658284313, 0.658284313, 0.658284313, 0.658284313], degree=3))
            ThreePointArc((19.477332048, -254.141993575), (20.557337263, -235.261485452), (8.107077378, -221.026632904))
        make_face()
    extrude(amount=-BOSS_EXTRUDE3_DEPTH)

    # Sketch13 → Cut-Extrude8 (cut, through all)
    with BuildSketch(Plane.ZY):
        with Locations((-36.5, -285.8838444)):
            Circle(SKETCH13_R)
        with Locations((36.5, -285.8838444)):
            Circle(SKETCH13_R)
    extrude(amount=-CUT_EXTRUDE8_DEPTH, mode=Mode.SUBTRACT)

    # Sketch14 → Boss-Extrude4 (add)
    with BuildSketch(Plane(origin=(6.35, 0, 0), x_dir=(0, 0, -1), z_dir=(1, 0, 0))):
        with Locations((36.5, -259.525)):
            Circle(SKETCH14_R)
        with Locations((-36.5, -259.525)):
            Circle(SKETCH14_R)
    extrude(amount=-BOSS_EXTRUDE4_DEPTH)

    # Sketch15 → Boss-Extrude5 (add)
    with BuildSketch(Plane.ZY):
        Polygon((-27.161387672, -541.303523296), (-25.040067328, -539.182202952), (-39.182202952, -525.040067328), (-41.303523296, -527.161387672), align=None)
        Polygon((27.161387672, -541.303523296), (41.303523296, -527.161387672), (39.182202952, -525.040067328), (25.040067328, -539.182202952), align=None)
    extrude(amount=-BOSS_EXTRUDE5_DEPTH)

    # M3x0.5 Tapped Hole1 outline → M3x0.5 Tapped Hole1 (revolve, cut)
    with BuildSketch(Plane(origin=(3.175, -245.580582618, 245.580582618), x_dir=(1, 0, 0), z_dir=(0, -0.7071067811865476, 0.7071067811865476))):
        Polygon((1.25, -394.465393412), (0, -393.714317638), (0, -401.965393412), (1.25, -401.965393412), align=None)
    m3x0_5_tapped_hole1 = revolve(axis=Axis((3.175, -245.580582618, 245.580582618), (0, 0.7071067811865476, 0.7071067811865476)), mode=Mode.SUBTRACT)

    # M3x0.5 Tapped Hole1 2 outline → M3x0.5 Tapped Hole1 2 (revolve, cut)
    with BuildSketch(Plane(origin=(3.175, -254.419417382, 254.419417382), x_dir=(1, 0, 0), z_dir=(0, -0.7071067811865476, 0.7071067811865476))):
        Polygon((1.25, -394.465393412), (0, -393.714317638), (0, -401.965393412), (1.25, -401.965393412), align=None)
    m3x0_5_tapped_hole1_2 = revolve(axis=Axis((3.175, -254.419417382, 254.419417382), (0, 0.7071067811865476, 0.7071067811865476)), mode=Mode.SUBTRACT)

    # CirPattern2: M3x0.5 Tapped Hole1, M3x0.5 Tapped Hole1 2 ×2 about axis
    cirpattern2_axis = Axis((0, -500, 0), (-1, 0, 0))
    add([m3x0_5_tapped_hole1.rotate(cirpattern2_axis, i * CIRPATTERN2_ANGLE / (CIRPATTERN2_COUNT - 1)) for i in range(1, CIRPATTERN2_COUNT)], mode=Mode.SUBTRACT)
    add([m3x0_5_tapped_hole1_2.rotate(cirpattern2_axis, i * CIRPATTERN2_ANGLE / (CIRPATTERN2_COUNT - 1)) for i in range(1, CIRPATTERN2_COUNT)], mode=Mode.SUBTRACT)

    # Fillet2
    # the kernel refuses this fillet: 10 mm, written as the material it adds along each edge
    with BuildSketch(Plane(origin=(0, -539.182202952, -25.040067328), x_dir=(0, -0.7071067811865345, -0.7071067811865606), z_dir=(1, 0, 0)), Plane(origin=(0, -525.040067328, 39.182202952), x_dir=(0, -0.7071067811865546, 0.7071067811865404), z_dir=(1, 0, 0))) as fillet2_piece_1:
        with BuildLine():
            CenterArc((7.897030706, -8.71889272), FILLET2_R, 119.321067137, 41.330757835)
            Line((-1.538196466, -5.405814363), (-1.72690101, -5.339552795))
            ThreePointArc((-1.72690101, -5.339552795), (-0.879713349, -2.671432223), (-0.195320442, 0.043010753))
            Line((-0.195320442, 0.043010753), (0, 0.2))
            ThreePointArc((0, 0.2), (1.5, 0.2), (2.902059386, 0.174377854))
            Line((2.902059386, 0.174377854), (3, 0))
        make_face()
    extrude(amount=6.35)
    with BuildSketch(Plane(origin=(0, -525.040067328, -39.182202952), x_dir=(0, 0.8736315230708372, -0.4865880823622061), z_dir=(1, 0, 0)), Plane(origin=(0, -539.182202952, 25.040067328), x_dir=(0, -0.4865880823622095, -0.8736315230708354), z_dir=(1, 0, 0))) as fillet2_piece_2:
        with BuildLine():
            CenterArc((6.224742227, -9.981721717), FILLET2_R, 93.464746761, 41.330757835)
            Line((-0.821043125, -2.885461521), (-0.961958832, -2.743536317))
            ThreePointArc((-0.961958832, -2.743536317), (-0.602885664, -1.387994552), (-0.192364101, 0.054736208))
            Line((-0.192364101, 0.054736208), (0.012086878, 0.199634434))
            ThreePointArc((0.012086878, 0.199634434), (2.810199161, 0.115005986), (5.608311443, 0.199634434))
            Line((5.608311443, 0.199634434), (5.620398321, 0))
        make_face()
    extrude(amount=6.35)


solid = cut_extrude7_piece_2_1.part
